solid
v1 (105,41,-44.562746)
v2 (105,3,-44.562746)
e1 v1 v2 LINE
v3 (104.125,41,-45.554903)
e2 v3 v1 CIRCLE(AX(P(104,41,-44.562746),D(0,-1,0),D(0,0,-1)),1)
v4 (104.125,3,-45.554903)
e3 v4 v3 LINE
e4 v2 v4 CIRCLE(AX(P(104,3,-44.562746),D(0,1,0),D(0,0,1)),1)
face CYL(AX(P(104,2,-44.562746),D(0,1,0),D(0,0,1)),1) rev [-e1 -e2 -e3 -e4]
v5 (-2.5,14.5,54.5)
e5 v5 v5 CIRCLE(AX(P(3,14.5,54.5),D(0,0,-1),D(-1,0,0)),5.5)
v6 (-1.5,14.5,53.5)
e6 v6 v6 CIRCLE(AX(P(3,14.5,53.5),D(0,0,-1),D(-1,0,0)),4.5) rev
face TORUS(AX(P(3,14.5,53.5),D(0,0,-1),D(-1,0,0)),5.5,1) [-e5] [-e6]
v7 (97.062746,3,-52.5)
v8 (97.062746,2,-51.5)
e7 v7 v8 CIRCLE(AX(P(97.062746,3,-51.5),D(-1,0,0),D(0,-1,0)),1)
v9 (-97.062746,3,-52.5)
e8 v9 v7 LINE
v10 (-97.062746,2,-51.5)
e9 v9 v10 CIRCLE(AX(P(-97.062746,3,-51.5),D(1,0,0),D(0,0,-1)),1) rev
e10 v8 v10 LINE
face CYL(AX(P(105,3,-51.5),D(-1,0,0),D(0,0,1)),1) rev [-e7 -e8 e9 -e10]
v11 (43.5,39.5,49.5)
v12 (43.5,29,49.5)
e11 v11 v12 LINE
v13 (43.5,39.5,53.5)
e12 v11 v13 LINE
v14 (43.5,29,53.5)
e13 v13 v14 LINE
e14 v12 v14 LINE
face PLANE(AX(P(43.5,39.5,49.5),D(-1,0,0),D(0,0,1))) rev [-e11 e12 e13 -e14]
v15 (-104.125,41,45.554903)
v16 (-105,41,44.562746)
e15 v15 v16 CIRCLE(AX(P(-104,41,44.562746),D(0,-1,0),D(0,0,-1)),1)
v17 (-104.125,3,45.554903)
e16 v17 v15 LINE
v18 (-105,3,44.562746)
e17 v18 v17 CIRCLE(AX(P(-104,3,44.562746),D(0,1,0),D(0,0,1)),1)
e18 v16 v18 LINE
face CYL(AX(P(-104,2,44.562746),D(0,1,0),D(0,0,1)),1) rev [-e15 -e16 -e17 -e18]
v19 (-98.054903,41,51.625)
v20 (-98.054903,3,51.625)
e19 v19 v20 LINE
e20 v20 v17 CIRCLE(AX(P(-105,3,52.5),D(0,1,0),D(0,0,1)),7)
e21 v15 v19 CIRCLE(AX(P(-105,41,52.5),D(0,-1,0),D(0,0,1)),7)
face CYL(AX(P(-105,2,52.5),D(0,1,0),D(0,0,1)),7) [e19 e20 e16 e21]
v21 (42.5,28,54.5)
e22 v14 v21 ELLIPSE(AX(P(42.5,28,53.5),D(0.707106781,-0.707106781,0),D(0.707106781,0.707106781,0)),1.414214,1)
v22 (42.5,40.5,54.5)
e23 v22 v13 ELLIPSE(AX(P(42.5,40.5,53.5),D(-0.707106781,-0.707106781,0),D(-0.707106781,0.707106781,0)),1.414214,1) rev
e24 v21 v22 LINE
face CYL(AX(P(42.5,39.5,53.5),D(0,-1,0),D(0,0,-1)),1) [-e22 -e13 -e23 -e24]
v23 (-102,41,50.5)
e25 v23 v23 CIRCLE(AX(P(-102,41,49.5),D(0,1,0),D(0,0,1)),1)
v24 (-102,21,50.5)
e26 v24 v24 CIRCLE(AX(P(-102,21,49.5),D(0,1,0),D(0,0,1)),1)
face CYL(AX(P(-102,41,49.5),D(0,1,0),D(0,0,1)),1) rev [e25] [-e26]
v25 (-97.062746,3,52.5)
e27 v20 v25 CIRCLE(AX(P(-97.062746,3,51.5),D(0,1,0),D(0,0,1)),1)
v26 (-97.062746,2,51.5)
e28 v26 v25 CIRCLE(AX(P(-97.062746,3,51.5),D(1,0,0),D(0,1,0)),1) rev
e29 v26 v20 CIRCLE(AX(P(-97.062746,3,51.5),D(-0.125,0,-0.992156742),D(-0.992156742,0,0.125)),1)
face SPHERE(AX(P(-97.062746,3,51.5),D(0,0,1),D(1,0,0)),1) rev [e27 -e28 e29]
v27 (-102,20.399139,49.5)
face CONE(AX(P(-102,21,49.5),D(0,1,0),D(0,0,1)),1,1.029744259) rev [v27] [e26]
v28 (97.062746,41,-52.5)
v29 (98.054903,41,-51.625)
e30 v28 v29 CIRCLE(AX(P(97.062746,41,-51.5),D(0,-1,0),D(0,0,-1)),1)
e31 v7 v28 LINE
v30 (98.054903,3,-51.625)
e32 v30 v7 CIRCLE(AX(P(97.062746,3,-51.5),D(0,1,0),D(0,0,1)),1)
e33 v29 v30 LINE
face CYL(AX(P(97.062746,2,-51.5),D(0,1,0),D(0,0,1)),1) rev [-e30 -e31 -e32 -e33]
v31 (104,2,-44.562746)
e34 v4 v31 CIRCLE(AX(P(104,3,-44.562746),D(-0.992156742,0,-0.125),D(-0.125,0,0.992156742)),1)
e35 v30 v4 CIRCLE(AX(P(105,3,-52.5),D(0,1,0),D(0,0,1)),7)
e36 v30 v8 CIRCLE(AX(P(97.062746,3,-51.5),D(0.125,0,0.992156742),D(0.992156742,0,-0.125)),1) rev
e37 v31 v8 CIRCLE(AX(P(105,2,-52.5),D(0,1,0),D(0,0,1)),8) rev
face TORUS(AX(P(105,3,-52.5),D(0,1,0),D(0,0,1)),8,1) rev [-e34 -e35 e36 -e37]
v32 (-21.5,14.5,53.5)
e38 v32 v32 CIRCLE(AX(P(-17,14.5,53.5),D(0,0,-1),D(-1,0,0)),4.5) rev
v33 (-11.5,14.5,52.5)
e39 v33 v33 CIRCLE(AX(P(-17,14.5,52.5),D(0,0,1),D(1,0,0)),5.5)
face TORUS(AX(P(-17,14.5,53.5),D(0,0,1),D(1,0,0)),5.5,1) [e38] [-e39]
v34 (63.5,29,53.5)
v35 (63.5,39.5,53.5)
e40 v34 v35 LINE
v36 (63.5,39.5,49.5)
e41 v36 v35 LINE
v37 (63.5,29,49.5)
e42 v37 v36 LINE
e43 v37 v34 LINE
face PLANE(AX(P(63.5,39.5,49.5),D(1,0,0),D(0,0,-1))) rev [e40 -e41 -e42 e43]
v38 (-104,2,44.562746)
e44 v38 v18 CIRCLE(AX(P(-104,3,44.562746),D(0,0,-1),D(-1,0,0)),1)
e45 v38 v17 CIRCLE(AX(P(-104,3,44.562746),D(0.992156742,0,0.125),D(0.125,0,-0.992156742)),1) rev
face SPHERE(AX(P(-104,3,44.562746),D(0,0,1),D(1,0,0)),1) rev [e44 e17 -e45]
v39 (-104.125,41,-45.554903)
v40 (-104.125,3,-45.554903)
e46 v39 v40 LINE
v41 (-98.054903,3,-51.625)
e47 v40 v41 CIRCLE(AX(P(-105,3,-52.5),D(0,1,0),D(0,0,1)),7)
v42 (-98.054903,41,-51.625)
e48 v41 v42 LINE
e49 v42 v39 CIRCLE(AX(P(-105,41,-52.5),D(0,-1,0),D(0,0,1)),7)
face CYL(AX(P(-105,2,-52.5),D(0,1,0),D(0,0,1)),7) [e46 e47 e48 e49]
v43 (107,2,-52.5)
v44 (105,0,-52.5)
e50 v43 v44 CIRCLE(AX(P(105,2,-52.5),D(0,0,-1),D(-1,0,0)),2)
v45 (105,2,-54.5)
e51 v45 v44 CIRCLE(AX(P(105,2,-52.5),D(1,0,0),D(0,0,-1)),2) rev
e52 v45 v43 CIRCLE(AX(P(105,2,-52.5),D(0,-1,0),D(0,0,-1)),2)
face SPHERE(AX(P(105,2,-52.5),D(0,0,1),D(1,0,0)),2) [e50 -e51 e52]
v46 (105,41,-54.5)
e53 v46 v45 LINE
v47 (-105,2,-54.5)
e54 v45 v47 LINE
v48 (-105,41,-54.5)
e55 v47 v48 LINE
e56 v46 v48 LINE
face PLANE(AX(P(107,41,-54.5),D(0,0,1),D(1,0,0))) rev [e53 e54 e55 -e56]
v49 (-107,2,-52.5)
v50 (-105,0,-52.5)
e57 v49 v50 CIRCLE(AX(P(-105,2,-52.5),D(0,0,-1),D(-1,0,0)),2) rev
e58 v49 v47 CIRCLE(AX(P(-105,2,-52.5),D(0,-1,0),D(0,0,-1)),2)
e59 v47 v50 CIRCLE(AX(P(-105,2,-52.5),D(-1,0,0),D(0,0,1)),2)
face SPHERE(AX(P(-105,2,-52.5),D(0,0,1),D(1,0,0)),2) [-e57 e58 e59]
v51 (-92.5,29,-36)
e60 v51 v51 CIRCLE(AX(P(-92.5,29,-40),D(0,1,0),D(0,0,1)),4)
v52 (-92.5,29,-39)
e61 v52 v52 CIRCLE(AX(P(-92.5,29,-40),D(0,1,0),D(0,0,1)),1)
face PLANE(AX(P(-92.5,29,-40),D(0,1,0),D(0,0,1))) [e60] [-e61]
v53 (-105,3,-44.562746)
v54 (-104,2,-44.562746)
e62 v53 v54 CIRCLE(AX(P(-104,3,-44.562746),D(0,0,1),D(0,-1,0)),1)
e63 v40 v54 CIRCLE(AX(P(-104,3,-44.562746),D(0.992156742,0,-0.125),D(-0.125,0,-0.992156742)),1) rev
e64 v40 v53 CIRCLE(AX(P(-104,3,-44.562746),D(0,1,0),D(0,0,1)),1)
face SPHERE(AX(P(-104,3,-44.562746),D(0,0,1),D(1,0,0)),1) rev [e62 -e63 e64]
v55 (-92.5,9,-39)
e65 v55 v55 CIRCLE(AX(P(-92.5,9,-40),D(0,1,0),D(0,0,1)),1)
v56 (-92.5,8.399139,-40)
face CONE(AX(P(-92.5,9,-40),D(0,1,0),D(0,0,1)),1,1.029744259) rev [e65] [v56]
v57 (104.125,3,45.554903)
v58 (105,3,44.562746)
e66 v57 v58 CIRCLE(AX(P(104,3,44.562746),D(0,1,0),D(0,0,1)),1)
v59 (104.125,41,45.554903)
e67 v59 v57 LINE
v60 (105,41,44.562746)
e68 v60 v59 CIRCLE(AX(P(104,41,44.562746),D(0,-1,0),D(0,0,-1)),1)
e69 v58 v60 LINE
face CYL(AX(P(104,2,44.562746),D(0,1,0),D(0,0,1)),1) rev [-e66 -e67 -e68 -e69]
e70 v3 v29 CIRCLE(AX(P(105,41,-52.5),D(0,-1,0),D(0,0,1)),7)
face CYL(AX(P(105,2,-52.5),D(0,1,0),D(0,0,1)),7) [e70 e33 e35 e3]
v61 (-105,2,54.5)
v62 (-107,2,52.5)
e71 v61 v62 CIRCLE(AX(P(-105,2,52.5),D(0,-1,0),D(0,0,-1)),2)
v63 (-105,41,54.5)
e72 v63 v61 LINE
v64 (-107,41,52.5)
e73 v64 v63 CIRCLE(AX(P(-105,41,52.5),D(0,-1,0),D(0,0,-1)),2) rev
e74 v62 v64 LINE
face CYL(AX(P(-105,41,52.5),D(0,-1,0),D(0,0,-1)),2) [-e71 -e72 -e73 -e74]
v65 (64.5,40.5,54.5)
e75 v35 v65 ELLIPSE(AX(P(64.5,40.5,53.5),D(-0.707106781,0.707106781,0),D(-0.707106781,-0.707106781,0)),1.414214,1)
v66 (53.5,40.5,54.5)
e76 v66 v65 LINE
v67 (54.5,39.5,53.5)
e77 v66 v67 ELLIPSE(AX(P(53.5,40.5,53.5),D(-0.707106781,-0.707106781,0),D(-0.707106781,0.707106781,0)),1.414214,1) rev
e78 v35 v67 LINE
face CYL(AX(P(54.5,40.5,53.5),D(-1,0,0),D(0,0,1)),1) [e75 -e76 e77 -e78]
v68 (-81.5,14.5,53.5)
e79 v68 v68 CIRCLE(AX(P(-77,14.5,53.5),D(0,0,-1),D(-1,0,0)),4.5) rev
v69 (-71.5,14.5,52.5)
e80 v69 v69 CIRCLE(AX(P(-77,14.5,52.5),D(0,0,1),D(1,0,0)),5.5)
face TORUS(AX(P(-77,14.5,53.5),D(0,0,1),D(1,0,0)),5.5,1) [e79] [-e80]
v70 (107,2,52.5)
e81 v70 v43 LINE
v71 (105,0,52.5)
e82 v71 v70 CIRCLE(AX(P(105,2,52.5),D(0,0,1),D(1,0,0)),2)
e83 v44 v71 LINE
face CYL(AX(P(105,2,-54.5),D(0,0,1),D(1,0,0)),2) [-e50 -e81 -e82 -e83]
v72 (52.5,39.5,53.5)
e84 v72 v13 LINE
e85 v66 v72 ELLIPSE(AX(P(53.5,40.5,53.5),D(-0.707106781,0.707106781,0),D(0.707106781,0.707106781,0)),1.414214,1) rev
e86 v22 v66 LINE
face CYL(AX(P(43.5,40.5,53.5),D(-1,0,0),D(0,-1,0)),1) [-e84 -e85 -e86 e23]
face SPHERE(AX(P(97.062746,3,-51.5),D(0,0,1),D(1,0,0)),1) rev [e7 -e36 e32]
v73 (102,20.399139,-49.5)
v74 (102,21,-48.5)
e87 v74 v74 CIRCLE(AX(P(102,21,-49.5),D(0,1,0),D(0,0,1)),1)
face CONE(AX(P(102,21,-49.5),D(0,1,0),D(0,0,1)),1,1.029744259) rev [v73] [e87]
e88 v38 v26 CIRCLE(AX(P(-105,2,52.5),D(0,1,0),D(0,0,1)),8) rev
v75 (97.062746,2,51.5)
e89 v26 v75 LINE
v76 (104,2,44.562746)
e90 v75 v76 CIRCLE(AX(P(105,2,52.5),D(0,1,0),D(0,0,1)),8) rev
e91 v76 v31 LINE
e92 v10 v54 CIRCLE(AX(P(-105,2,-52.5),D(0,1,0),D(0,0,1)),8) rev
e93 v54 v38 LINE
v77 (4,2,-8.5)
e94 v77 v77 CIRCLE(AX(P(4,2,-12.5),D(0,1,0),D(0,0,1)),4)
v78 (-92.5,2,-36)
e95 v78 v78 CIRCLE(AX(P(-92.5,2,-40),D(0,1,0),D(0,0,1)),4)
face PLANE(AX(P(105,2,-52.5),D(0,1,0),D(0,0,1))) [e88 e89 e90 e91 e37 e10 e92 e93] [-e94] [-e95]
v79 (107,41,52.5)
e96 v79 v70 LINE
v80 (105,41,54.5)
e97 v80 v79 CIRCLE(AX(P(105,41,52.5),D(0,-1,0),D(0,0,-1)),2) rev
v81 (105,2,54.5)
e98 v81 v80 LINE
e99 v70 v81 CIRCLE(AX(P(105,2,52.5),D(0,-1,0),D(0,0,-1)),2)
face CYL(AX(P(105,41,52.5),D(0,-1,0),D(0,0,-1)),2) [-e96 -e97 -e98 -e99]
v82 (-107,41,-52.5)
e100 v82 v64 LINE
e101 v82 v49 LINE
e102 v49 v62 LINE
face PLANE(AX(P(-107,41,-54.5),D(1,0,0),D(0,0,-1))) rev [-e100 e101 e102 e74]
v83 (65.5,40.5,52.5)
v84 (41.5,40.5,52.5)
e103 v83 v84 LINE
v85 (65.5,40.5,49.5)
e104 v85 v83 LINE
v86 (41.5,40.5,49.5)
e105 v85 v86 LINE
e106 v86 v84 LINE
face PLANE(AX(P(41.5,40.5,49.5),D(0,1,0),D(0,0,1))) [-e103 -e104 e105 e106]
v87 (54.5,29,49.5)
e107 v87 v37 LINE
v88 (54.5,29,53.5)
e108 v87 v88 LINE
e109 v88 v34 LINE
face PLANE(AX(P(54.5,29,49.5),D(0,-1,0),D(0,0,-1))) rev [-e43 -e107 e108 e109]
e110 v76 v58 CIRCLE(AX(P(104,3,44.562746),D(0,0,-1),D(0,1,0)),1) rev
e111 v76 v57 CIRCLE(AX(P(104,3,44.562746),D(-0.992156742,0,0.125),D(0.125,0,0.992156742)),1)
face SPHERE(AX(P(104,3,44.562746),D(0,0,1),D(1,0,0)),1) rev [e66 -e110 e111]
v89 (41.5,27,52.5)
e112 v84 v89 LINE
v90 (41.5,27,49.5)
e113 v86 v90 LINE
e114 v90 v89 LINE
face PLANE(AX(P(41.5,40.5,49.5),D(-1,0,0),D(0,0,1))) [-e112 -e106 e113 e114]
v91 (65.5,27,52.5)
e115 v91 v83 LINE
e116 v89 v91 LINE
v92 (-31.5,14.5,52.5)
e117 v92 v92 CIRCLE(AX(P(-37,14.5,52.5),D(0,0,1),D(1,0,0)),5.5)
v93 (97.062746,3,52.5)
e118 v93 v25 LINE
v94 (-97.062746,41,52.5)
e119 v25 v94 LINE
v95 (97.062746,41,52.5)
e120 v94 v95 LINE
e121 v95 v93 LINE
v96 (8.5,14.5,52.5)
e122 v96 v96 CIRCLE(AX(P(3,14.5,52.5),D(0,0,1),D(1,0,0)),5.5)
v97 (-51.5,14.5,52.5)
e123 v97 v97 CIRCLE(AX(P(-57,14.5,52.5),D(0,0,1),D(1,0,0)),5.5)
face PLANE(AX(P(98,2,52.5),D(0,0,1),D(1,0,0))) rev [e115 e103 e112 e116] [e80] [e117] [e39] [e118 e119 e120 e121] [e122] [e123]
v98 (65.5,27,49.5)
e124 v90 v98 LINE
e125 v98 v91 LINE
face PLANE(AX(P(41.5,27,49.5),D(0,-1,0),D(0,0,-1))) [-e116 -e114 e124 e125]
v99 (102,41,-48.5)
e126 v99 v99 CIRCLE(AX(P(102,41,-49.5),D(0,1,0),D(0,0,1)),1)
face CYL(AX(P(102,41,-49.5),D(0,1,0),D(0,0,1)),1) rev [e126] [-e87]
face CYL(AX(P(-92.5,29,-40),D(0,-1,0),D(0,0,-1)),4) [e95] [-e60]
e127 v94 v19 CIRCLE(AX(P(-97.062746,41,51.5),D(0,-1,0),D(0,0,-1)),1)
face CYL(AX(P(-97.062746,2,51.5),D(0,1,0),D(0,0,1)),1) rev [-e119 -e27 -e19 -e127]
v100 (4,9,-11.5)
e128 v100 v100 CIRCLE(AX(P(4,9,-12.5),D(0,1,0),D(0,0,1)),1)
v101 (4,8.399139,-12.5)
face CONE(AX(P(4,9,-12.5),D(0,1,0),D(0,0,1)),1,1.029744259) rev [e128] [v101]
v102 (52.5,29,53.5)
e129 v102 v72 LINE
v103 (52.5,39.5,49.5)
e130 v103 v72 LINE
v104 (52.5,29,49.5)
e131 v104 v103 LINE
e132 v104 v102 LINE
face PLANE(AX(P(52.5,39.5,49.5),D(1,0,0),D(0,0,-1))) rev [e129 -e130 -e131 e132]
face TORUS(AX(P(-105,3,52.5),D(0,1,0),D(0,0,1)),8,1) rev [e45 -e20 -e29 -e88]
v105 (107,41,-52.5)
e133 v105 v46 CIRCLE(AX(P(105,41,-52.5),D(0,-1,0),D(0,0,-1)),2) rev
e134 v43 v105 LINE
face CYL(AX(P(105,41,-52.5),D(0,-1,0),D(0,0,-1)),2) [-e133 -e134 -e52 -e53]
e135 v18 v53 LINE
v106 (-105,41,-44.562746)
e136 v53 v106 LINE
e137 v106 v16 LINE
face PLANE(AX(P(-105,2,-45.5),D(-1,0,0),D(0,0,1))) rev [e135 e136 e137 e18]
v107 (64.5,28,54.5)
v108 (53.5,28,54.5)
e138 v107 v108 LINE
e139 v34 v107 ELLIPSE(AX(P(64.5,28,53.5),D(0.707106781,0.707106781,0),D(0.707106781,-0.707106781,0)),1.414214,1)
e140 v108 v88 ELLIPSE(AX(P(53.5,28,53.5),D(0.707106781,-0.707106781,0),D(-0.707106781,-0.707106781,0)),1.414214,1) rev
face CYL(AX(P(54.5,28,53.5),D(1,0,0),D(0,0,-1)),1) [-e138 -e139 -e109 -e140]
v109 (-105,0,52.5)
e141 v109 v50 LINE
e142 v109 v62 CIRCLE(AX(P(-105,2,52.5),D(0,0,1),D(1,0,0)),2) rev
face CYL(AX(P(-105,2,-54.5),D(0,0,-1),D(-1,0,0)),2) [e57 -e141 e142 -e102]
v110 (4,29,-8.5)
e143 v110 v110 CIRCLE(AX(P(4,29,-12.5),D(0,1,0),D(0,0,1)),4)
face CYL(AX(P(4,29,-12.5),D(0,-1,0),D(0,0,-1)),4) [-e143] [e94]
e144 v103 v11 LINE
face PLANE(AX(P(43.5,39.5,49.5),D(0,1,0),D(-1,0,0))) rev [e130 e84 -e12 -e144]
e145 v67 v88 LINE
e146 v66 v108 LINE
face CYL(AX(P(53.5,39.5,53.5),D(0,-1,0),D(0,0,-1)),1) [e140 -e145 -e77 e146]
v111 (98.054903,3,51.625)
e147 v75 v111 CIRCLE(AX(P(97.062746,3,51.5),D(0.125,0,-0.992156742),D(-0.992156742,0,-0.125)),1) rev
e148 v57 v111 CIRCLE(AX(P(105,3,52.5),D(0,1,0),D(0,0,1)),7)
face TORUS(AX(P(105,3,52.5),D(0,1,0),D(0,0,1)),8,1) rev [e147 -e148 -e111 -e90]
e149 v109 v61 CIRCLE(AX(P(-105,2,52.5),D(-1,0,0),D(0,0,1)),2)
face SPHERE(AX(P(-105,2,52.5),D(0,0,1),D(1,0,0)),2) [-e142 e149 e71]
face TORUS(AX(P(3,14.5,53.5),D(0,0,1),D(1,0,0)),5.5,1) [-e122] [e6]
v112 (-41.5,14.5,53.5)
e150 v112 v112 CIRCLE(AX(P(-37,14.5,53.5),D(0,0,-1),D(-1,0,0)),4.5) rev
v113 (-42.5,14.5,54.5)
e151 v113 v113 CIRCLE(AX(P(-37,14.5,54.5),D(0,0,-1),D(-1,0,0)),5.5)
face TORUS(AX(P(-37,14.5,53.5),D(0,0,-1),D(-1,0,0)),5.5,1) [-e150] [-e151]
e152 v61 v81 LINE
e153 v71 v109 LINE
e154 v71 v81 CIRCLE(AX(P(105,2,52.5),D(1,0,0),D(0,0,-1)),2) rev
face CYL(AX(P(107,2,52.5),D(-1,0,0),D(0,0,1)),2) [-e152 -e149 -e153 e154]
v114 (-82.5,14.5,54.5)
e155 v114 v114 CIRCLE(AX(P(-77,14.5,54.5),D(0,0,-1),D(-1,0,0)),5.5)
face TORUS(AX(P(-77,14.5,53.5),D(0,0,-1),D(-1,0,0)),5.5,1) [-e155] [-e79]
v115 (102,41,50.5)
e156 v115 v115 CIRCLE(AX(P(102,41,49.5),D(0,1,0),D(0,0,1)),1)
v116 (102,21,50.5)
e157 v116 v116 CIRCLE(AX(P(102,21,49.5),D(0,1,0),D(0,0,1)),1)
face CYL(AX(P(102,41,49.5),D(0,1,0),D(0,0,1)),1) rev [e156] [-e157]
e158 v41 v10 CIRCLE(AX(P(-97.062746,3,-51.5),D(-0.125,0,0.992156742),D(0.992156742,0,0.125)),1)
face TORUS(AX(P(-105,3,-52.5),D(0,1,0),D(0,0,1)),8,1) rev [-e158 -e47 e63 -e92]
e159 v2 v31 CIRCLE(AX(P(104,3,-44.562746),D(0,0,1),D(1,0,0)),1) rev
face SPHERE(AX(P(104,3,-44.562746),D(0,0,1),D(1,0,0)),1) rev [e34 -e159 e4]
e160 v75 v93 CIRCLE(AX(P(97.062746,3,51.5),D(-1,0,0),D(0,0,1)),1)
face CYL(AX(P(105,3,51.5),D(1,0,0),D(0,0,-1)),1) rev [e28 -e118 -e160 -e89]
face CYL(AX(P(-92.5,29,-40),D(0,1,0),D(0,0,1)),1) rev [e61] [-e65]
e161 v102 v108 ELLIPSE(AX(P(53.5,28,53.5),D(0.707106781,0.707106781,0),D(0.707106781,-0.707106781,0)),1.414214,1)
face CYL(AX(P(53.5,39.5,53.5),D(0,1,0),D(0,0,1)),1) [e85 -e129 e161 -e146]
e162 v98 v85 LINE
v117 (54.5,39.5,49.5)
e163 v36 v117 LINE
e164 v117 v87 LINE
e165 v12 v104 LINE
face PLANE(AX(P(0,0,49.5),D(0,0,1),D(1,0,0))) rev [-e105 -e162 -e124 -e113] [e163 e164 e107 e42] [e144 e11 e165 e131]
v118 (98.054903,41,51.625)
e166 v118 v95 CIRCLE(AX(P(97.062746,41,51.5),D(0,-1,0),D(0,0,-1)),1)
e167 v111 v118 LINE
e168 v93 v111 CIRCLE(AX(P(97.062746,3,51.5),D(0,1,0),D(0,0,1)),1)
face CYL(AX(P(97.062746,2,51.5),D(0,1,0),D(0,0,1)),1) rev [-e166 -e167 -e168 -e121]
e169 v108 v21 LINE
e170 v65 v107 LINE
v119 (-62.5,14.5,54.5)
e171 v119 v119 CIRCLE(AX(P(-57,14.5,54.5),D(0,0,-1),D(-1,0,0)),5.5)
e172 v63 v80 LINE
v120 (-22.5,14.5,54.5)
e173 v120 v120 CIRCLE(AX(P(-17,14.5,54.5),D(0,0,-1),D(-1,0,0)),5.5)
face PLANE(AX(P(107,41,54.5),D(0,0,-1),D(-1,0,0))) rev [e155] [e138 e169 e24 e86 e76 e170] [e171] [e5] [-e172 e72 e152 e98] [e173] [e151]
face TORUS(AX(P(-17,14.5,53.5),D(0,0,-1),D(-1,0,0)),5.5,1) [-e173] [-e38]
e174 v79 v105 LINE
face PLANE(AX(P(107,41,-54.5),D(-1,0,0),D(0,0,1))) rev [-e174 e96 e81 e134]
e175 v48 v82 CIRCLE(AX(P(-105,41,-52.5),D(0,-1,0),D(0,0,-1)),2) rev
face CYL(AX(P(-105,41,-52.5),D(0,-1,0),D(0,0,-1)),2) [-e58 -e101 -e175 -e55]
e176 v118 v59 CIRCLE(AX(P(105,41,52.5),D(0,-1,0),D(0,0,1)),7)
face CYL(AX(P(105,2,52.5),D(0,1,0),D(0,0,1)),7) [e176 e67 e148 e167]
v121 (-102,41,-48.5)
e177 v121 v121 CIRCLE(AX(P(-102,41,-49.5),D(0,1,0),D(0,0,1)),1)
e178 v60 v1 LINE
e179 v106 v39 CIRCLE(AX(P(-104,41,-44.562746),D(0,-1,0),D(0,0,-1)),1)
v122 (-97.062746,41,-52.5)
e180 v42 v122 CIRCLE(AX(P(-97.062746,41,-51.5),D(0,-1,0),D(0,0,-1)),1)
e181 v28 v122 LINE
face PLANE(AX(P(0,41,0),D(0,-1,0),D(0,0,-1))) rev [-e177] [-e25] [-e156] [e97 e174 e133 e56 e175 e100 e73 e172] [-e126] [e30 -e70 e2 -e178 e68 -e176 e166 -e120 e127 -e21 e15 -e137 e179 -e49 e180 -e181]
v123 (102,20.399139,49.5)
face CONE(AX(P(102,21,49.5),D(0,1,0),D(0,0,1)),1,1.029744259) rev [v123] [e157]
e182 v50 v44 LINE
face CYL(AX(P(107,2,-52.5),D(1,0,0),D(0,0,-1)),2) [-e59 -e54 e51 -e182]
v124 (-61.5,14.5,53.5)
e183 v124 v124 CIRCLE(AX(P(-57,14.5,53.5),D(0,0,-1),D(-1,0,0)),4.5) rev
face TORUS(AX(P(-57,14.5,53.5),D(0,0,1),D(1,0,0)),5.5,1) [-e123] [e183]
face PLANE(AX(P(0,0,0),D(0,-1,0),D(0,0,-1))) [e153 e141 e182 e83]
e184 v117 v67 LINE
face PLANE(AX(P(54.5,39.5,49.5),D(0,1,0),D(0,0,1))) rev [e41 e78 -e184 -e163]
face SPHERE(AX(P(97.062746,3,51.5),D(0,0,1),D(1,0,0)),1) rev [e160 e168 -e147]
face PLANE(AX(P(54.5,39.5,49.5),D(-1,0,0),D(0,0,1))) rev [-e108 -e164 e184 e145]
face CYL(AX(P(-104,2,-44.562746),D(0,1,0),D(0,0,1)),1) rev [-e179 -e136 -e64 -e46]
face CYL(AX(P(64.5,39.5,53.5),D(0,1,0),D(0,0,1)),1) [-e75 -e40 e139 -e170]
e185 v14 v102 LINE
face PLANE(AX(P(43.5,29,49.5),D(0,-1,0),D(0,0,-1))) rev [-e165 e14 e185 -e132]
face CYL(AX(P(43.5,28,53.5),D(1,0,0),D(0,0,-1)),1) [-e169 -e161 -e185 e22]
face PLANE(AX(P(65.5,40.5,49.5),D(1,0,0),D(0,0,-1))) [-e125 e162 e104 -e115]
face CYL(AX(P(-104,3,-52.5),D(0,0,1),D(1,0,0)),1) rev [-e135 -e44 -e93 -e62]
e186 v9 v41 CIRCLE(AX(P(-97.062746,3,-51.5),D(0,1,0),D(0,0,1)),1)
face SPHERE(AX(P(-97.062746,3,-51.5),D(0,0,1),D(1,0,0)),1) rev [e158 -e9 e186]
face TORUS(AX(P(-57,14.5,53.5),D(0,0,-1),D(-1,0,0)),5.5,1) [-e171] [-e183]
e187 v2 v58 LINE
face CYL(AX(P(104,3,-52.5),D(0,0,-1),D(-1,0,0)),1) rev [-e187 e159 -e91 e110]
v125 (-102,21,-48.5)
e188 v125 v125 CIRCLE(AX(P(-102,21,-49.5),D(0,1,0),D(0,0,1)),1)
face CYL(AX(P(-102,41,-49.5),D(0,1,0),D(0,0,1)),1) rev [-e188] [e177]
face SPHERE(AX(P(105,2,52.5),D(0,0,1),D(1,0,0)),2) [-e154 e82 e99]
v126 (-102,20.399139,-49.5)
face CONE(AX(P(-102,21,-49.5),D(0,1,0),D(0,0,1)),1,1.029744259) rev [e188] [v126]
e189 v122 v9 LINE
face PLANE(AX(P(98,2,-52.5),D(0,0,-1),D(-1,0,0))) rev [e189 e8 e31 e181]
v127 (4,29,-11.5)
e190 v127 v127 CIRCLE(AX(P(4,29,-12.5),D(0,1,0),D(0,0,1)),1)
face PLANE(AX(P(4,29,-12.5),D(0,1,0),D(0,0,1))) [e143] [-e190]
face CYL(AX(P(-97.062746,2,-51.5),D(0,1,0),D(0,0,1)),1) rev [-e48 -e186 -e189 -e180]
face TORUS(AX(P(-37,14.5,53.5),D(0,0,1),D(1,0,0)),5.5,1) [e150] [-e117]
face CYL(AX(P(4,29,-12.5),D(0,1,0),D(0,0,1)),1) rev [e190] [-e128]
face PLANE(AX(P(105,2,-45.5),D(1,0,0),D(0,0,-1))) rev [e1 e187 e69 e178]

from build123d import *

# Parameters (mm, degrees)
SKETCH2_W                           = 214
SKETCH2_H                           = 109
BOSS_EXTRUDE1_DEPTH                 = 41
CUT_EXTRUDE1_DEPTH                  = 39
SKETCH4_R                           = 4.5
CUT_EXTRUDE2_DEPTH                  = 3
SKETCH5_R                           = 4
BOSS_EXTRUDE2_DEPTH                 = 27
SKETCH7_W                           = 24
SKETCH7_H                           = 13.5
BOSS_EXTRUDE5_DEPTH                 = 5
SKETCH8_W                           = 9
SKETCH8_H                           = 10.5
CUT_EXTRUDE3_DEPTH                  = 5
FILLET1_R                           = 2
FILLET2_R                           = 1
F_2_0MM_DOWEL_HOLE1_D               = 2
F_2_0MM_DOWEL_HOLE1_DEPTH           = 20
F_2_0MM_DOWEL_HOLE1_TIP             = 0.600860619
F_2_0MM_DOWEL_HOLE1_ON_FACE_2_D     = 2
F_2_0MM_DOWEL_HOLE1_ON_FACE_2_DEPTH = 20
F_2_0MM_DOWEL_HOLE1_ON_FACE_2_TIP   = 0.600860619
FILLET4_R                           = 1
FILLET5_R                           = 1


with BuildPart() as part:
    # Sketch2 → Boss-Extrude1 (new body)
    with BuildSketch(Plane(origin=(0, 0, 0), x_dir=(1, 0, 0), z_dir=(0, 1, 0))):
        Rectangle(SKETCH2_W, SKETCH2_H)
    extrude(amount=BOSS_EXTRUDE1_DEPTH)

    # Sketch3 → Cut-Extrude1 (cut)
    with BuildSketch(Plane(origin=(0, 41, 0), x_dir=(1, 0, 0), z_dir=(0, 1, 0))):
        with BuildLine():
            Line((98, 52.5), (-98, 52.5))
            ThreePointArc((-98, 52.5), (-100.050252532, 47.550252532), (-105, 45.5))
            Line((-105, 45.5), (-105, -45.5))
            ThreePointArc((-105, -45.5), (-100.050252532, -47.550252532), (-98, -52.5))
            Line((-98, -52.5), (98, -52.5))
            ThreePointArc((98, -52.5), (100.050252532, -47.550252532), (105, -45.5))
            Line((105, -45.5), (105, 45.5))
            ThreePointArc((105, 45.5), (100.050252532, 47.550252532), (98, 52.5))
        make_face()
    extrude(amount=-CUT_EXTRUDE1_DEPTH, mode=Mode.SUBTRACT)

    # Sketch4 → Cut-Extrude2 (cut)
    with BuildSketch(Plane.XY.offset(54.5)):
        with Locations((-77, 14.5)):
            Circle(SKETCH4_R)
        with Locations((-57, 14.5)):
            Circle(SKETCH4_R)
        with Locations((-37, 14.5)):
            Circle(SKETCH4_R)
        with Locations((-17, 14.5)):
            Circle(SKETCH4_R)
        with Locations((3, 14.5)):
            Circle(SKETCH4_R)
    extrude(amount=-CUT_EXTRUDE2_DEPTH, mode=Mode.SUBTRACT)

    # Sketch5 → Boss-Extrude2 (add)
    with BuildSketch(Plane(origin=(0, 2, 0), x_dir=(1, 0, 0), z_dir=(0, 1, 0))):
        with Locations(Location((-92.5, 40, 0), (0, 0, 270))):
            Circle(SKETCH5_R)
        with Locations(Location((4, 12.5, 0), (0, 0, 270))):
            Circle(SKETCH5_R)
    extrude(amount=BOSS_EXTRUDE2_DEPTH)

    # Sketch7 → Boss-Extrude5 (add)
    with BuildSketch(Plane.XY.offset(54.5)):
        with Locations((53.5, 33.75)):
            Rectangle(SKETCH7_W, SKETCH7_H)
    extrude(amount=-BOSS_EXTRUDE5_DEPTH)

    # Sketch8 → Cut-Extrude3 (cut)
    with BuildSketch(Plane.XY.offset(54.5)):
        with Locations((48, 34.25)):
            Rectangle(SKETCH8_W, SKETCH8_H)
        with Locations((59, 34.25)):
            Rectangle(SKETCH8_W, SKETCH8_H)
    extrude(amount=-CUT_EXTRUDE3_DEPTH, mode=Mode.SUBTRACT)

    # Fillet1
    fillet1_edges = [part.edges().sort_by_distance(p)[0] for p in [
        (0, 0, -54.5),
        (107, 0, 0),
        (0, 0, 54.5),
        (-107, 0, 0),
        (-107, 20.5, -54.5),
        (107, 20.5, -54.5),
        (107, 20.5, 54.5),
        (-107, 20.5, 54.5),
    ]]
    fillet(fillet1_edges, radius=FILLET1_R)

    # Fillet2
    fillet2_edges = [part.edges().sort_by_distance(p)[0] for p in [
        (43.5, 34.25, 54.5),
        (48, 29, 54.5),
        (52.5, 34.25, 54.5),
        (48, 39.5, 54.5),
        (54.5, 34.25, 54.5),
        (59, 29, 54.5),
        (63.5, 34.25, 54.5),
        (59, 39.5, 54.5),
    ]]
    fillet(fillet2_edges, radius=FILLET2_R - 0.0001)  # a hair under: the kernel refuses the full size

    # Ø2.0mm Dowel Hole1
    with Locations(Plane(origin=(-102, 41, 49.5), x_dir=(0, 0, 1), z_dir=(0, 1, 0))):
        with Locations((0, 0), (-99, 204), (0, 204), (-99, 0)):
            Hole(F_2_0MM_DOWEL_HOLE1_D / 2, depth=F_2_0MM_DOWEL_HOLE1_DEPTH)
            with Locations((0, 0, -(F_2_0MM_DOWEL_HOLE1_DEPTH + F_2_0MM_DOWEL_HOLE1_TIP / 2))):  # 118° drill point
                Cone(0, F_2_0MM_DOWEL_HOLE1_D / 2, F_2_0MM_DOWEL_HOLE1_TIP, mode=Mode.SUBTRACT)

    # Ø2.0mm Dowel Hole1 on face 2
    with Locations(Plane(origin=(-92.5, 29, -40), x_dir=(0, 0, 1), z_dir=(0, 1, 0))):
        with Locations((0, 0), (27.5, 96.5)):
            Hole(F_2_0MM_DOWEL_HOLE1_ON_FACE_2_D / 2, depth=F_2_0MM_DOWEL_HOLE1_ON_FACE_2_DEPTH)
            with Locations((0, 0, -(F_2_0MM_DOWEL_HOLE1_ON_FACE_2_DEPTH + F_2_0MM_DOWEL_HOLE1_ON_FACE_2_TIP / 2))):  # 118° drill point
                Cone(0, F_2_0MM_DOWEL_HOLE1_ON_FACE_2_D / 2, F_2_0MM_DOWEL_HOLE1_ON_FACE_2_TIP, mode=Mode.SUBTRACT)

    # Fillet4
    fillet4_edges = [part.edges().sort_by_distance(p)[0] for p in [
        (-81.5, 14.5, 52.5),
        (-81.5, 14.5, 54.5),
        (-61.5, 14.5, 52.5),
        (-61.5, 14.5, 54.5),
        (-41.5, 14.5, 52.5),
        (-41.5, 14.5, 54.5),
        (-21.5, 14.5, 52.5),
        (-21.5, 14.5, 54.5),
        (-1.5, 14.5, 52.5),
        (-1.5, 14.5, 54.5),
    ]]
    fillet(fillet4_edges, radius=FILLET4_R - 0.0001)  # a hair under: the kernel refuses the full size

    # Fillet5
    fillet5_edges = [part.edges().sort_by_distance(p)[0] for p in [
        (100.050252532, 2, -47.550252532),
        (98, 21.5, -52.5),
        (105, 2, 0),
        (105, 21.5, -45.5),
        (100.050252532, 2, 47.550252532),
        (105, 21.5, 45.5),
        (0, 2, 52.5),
        (98, 21.5, 52.5),
        (-100.050252532, 2, 47.550252532),
        (-98, 21.5, 52.5),
        (-105, 2, 0),
        (-105, 21.5, 45.5),
        (-100.050252532, 2, -47.550252532),
        (-105, 21.5, -45.5),
        (0, 2, -52.5),
        (-98, 21.5, -52.5),
    ]]
    fillet(fillet5_edges, radius=FILLET5_R)


solid = part.part
